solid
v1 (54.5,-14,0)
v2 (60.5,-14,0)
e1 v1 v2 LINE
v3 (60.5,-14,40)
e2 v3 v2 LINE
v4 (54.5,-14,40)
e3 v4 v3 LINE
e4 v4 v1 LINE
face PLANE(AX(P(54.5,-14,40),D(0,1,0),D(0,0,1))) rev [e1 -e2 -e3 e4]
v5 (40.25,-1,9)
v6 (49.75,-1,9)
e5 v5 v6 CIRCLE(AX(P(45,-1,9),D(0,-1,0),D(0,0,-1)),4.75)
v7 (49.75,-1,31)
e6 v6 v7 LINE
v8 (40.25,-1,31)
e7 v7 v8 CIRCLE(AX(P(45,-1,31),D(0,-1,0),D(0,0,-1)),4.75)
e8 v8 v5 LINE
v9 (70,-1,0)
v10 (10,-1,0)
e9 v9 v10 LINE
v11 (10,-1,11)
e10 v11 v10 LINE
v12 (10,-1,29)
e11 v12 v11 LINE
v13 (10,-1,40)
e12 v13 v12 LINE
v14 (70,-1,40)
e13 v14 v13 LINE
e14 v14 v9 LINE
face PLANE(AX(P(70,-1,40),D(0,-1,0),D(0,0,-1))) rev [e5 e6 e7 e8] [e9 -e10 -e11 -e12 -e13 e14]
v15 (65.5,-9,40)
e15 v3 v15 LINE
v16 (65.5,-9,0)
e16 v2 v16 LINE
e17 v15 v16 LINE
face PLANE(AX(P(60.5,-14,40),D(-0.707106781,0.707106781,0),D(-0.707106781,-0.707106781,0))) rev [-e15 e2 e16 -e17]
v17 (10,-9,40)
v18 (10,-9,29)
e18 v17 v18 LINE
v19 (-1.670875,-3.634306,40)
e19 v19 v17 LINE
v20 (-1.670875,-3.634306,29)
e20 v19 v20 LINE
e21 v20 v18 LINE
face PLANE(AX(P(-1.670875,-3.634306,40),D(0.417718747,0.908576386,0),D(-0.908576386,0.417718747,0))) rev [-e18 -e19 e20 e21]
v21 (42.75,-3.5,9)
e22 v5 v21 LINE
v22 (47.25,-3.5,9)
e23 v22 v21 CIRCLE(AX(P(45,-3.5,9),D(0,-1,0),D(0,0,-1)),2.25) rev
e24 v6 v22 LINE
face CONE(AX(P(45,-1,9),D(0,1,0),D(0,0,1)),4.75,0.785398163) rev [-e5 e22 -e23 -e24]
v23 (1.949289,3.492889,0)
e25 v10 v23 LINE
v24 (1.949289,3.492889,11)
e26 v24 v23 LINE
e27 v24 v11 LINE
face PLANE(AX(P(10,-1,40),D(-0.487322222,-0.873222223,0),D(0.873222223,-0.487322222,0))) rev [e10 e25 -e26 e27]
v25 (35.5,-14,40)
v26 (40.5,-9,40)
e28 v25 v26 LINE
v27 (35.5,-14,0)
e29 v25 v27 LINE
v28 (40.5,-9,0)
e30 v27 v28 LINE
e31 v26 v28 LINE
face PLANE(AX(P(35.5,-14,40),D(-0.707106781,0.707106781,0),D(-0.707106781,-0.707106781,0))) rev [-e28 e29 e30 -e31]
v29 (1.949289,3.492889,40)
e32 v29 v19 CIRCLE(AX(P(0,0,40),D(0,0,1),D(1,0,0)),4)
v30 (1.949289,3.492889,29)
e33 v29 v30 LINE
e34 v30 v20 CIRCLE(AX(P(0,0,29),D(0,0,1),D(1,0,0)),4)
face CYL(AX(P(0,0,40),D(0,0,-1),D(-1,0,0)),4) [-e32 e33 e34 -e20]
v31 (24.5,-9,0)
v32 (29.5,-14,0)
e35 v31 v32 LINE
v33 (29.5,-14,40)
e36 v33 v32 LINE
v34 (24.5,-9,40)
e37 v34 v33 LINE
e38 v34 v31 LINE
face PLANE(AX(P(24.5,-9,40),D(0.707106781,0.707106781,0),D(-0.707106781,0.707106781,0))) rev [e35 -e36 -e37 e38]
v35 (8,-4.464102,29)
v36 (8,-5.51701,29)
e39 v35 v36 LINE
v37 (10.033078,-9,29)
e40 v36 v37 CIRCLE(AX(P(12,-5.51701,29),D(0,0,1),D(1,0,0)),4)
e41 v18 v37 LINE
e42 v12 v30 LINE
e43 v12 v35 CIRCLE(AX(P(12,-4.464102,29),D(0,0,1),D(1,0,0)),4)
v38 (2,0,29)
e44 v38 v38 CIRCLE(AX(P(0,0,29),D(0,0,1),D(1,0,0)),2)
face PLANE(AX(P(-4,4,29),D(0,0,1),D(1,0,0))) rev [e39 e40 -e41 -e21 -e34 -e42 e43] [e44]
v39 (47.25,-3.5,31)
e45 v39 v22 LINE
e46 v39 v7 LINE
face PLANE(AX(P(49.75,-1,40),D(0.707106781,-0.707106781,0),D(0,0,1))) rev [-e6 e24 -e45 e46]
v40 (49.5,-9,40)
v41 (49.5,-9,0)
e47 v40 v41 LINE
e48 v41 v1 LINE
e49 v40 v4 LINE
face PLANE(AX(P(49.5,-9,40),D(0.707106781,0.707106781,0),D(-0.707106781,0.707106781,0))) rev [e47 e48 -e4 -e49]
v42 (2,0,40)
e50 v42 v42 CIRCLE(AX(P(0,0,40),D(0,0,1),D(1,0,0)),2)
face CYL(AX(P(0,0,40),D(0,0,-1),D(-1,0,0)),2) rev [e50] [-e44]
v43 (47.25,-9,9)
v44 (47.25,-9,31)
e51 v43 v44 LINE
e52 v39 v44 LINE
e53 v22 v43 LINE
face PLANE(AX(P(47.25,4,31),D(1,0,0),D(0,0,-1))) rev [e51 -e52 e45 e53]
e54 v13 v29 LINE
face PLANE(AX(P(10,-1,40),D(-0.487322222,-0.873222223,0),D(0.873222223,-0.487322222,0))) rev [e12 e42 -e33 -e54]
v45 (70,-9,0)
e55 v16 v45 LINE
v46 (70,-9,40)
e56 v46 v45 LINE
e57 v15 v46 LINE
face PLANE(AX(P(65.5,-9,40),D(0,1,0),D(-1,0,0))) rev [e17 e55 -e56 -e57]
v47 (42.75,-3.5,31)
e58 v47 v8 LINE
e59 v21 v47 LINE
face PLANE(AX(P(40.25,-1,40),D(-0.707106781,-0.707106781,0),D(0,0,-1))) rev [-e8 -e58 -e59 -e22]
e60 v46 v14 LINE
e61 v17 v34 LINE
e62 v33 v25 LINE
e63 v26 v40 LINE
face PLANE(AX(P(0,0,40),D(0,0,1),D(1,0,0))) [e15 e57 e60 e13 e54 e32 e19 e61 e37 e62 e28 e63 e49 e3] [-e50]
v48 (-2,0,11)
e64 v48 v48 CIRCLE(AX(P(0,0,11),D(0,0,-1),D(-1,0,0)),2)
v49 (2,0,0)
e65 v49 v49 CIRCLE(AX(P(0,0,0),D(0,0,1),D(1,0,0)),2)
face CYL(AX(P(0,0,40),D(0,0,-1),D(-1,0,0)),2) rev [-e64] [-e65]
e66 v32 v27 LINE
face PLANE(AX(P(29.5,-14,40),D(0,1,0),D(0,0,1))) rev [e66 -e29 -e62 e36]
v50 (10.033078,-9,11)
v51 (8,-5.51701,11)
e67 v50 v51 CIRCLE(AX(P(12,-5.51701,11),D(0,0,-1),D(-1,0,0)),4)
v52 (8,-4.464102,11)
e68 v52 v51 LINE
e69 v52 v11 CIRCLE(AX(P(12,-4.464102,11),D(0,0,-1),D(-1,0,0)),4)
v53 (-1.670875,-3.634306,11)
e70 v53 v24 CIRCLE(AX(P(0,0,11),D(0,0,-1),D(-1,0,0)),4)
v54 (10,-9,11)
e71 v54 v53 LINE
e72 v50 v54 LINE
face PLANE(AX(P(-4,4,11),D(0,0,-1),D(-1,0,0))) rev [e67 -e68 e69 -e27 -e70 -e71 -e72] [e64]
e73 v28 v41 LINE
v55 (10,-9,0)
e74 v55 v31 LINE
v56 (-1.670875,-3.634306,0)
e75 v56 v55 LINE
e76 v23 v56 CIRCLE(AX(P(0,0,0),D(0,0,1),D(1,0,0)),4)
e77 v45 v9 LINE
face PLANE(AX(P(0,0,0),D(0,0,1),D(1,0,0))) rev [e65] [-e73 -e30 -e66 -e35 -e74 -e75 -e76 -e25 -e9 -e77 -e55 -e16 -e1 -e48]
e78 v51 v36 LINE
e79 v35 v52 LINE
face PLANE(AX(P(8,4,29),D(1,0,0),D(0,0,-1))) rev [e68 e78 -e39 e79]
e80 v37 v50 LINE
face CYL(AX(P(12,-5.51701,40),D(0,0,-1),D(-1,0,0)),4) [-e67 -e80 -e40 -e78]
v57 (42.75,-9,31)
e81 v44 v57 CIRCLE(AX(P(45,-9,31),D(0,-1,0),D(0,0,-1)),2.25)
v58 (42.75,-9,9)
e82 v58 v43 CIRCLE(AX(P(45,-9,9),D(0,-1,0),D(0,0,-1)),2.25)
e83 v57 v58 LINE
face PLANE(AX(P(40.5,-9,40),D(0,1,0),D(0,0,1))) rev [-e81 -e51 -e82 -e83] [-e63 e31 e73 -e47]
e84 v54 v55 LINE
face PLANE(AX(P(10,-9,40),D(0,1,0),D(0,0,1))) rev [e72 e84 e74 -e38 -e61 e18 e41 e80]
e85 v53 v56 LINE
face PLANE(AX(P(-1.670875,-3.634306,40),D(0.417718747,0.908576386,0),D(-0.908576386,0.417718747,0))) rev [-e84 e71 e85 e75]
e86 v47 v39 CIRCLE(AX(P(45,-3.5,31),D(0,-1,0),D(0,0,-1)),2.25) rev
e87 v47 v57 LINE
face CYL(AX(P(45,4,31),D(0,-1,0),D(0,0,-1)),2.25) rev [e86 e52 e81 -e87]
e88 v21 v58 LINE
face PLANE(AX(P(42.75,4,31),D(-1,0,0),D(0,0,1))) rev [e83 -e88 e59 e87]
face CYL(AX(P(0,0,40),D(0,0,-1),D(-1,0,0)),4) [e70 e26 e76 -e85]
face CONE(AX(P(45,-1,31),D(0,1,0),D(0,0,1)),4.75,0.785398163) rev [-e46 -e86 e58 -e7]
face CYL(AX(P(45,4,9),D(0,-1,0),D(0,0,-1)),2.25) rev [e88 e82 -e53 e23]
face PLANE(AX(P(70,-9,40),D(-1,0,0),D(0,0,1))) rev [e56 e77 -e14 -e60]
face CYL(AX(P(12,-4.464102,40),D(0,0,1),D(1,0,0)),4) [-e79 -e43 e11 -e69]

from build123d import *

# Parameters (mm, degrees)
SKETCH1_R           = 2
BOSS_EXTRUDE1_DEPTH = 40
CUT_EXTRUDE1_DEPTH  = 82.663945533
CHAMFER1_SIZE       = 2.5
SKETCH3_W           = 12
SKETCH3_H           = 18
CUT_EXTRUDE2_DEPTH  = 82.663945533
FILLET1_R           = 4


with BuildPart() as part:
    # Sketch1 → Boss-Extrude1 (new body)
    with BuildSketch(Plane.XY):
        with BuildLine():
            Line((10, -9), (24.5, -9))
            Line((24.5, -9), (29.5, -14))
            Line((29.5, -14), (35.5, -14))
            Line((35.5, -14), (40.5, -9))
            Line((40.5, -9), (49.5, -9))
            Line((49.5, -9), (54.5, -14))
            Line((54.5, -14), (60.5, -14))
            Line((60.5, -14), (65.5, -9))
            Line((65.5, -9), (70, -9))
            Line((70, -9), (70, -1))
            Line((70, -1), (10, -1))
            Line((10, -1), (1.949288889, 3.492888894))
            ThreePointArc((1.949288889, 3.492888894), (-3.566315144, 1.811462473), (-1.670874988, -3.634305542))
            Line((-1.670874988, -3.634305542), (10, -9))
        make_face()
        Circle(SKETCH1_R, mode=Mode.SUBTRACT)
    extrude(amount=BOSS_EXTRUDE1_DEPTH)

    # Sketch2 → Cut-Extrude1 (cut, through all)
    with BuildSketch(Plane.XZ.offset(9)):
        with BuildLine():
            Line((47.25, 31), (47.25, 9))
            ThreePointArc((47.25, 9), (45, 6.75), (42.75, 9))
            Line((42.75, 9), (42.75, 31))
            ThreePointArc((42.75, 31), (45, 33.25), (47.25, 31))
        make_face()
    extrude(amount=-CUT_EXTRUDE1_DEPTH, mode=Mode.SUBTRACT)

    # Chamfer1
    chamfer1_edges = [part.edges().sort_by_distance(p)[0] for p in [
        (42.75, -1, 20),
        (45, -1, 6.75),
        (47.25, -1, 20),
        (45, -1, 33.25),
    ]]
    chamfer(chamfer1_edges, length=CHAMFER1_SIZE)

    # Sketch3 → Cut-Extrude2 (cut, through all)
    with BuildSketch(Plane.XZ.offset(9)):
        with Locations((2, 20)):
            Rectangle(SKETCH3_W, SKETCH3_H)
    extrude(amount=-CUT_EXTRUDE2_DEPTH, mode=Mode.SUBTRACT)

    # Fillet1
    # the kernel refuses this fillet: 4 mm, written as the material it takes off along each edge
    with BuildSketch(Plane(origin=(8, 0.116147091, 29), x_dir=(0.8732222234943452, -0.4873222223494347, 0), z_dir=(0, 0, -1))) as fillet1_piece_1:
        with BuildLine():
            CenterArc((5.724945872, 2.05028607), FILLET1_R, 150.835269547, 60)
            Line((2.232056978, 3.999574959), (0, 0))
            Line((0, 0), (2.290367728, 0))
        make_face()
    extrude(amount=18, mode=Mode.SUBTRACT)
    with BuildSketch(Plane(origin=(8, -8.080498341, 11), x_dir=(0.9085763855616094, -0.4177187470054484, 0), z_dir=(0, 0, 1))) as fillet1_piece_2:
        with BuildLine():
            CenterArc((FILLET1_R * 0.640872096444, FILLET1_R), FILLET1_R, 204.690646006, 65.309353994)
            Line((-FILLET1_R * 0.267704289117, FILLET1_R * 0.582281252995), (0, 0))
            Line((0, 0), (FILLET1_R * 0.640872096444, 0))
        make_face()
    extrude(amount=18, mode=Mode.SUBTRACT)


solid = part.part
